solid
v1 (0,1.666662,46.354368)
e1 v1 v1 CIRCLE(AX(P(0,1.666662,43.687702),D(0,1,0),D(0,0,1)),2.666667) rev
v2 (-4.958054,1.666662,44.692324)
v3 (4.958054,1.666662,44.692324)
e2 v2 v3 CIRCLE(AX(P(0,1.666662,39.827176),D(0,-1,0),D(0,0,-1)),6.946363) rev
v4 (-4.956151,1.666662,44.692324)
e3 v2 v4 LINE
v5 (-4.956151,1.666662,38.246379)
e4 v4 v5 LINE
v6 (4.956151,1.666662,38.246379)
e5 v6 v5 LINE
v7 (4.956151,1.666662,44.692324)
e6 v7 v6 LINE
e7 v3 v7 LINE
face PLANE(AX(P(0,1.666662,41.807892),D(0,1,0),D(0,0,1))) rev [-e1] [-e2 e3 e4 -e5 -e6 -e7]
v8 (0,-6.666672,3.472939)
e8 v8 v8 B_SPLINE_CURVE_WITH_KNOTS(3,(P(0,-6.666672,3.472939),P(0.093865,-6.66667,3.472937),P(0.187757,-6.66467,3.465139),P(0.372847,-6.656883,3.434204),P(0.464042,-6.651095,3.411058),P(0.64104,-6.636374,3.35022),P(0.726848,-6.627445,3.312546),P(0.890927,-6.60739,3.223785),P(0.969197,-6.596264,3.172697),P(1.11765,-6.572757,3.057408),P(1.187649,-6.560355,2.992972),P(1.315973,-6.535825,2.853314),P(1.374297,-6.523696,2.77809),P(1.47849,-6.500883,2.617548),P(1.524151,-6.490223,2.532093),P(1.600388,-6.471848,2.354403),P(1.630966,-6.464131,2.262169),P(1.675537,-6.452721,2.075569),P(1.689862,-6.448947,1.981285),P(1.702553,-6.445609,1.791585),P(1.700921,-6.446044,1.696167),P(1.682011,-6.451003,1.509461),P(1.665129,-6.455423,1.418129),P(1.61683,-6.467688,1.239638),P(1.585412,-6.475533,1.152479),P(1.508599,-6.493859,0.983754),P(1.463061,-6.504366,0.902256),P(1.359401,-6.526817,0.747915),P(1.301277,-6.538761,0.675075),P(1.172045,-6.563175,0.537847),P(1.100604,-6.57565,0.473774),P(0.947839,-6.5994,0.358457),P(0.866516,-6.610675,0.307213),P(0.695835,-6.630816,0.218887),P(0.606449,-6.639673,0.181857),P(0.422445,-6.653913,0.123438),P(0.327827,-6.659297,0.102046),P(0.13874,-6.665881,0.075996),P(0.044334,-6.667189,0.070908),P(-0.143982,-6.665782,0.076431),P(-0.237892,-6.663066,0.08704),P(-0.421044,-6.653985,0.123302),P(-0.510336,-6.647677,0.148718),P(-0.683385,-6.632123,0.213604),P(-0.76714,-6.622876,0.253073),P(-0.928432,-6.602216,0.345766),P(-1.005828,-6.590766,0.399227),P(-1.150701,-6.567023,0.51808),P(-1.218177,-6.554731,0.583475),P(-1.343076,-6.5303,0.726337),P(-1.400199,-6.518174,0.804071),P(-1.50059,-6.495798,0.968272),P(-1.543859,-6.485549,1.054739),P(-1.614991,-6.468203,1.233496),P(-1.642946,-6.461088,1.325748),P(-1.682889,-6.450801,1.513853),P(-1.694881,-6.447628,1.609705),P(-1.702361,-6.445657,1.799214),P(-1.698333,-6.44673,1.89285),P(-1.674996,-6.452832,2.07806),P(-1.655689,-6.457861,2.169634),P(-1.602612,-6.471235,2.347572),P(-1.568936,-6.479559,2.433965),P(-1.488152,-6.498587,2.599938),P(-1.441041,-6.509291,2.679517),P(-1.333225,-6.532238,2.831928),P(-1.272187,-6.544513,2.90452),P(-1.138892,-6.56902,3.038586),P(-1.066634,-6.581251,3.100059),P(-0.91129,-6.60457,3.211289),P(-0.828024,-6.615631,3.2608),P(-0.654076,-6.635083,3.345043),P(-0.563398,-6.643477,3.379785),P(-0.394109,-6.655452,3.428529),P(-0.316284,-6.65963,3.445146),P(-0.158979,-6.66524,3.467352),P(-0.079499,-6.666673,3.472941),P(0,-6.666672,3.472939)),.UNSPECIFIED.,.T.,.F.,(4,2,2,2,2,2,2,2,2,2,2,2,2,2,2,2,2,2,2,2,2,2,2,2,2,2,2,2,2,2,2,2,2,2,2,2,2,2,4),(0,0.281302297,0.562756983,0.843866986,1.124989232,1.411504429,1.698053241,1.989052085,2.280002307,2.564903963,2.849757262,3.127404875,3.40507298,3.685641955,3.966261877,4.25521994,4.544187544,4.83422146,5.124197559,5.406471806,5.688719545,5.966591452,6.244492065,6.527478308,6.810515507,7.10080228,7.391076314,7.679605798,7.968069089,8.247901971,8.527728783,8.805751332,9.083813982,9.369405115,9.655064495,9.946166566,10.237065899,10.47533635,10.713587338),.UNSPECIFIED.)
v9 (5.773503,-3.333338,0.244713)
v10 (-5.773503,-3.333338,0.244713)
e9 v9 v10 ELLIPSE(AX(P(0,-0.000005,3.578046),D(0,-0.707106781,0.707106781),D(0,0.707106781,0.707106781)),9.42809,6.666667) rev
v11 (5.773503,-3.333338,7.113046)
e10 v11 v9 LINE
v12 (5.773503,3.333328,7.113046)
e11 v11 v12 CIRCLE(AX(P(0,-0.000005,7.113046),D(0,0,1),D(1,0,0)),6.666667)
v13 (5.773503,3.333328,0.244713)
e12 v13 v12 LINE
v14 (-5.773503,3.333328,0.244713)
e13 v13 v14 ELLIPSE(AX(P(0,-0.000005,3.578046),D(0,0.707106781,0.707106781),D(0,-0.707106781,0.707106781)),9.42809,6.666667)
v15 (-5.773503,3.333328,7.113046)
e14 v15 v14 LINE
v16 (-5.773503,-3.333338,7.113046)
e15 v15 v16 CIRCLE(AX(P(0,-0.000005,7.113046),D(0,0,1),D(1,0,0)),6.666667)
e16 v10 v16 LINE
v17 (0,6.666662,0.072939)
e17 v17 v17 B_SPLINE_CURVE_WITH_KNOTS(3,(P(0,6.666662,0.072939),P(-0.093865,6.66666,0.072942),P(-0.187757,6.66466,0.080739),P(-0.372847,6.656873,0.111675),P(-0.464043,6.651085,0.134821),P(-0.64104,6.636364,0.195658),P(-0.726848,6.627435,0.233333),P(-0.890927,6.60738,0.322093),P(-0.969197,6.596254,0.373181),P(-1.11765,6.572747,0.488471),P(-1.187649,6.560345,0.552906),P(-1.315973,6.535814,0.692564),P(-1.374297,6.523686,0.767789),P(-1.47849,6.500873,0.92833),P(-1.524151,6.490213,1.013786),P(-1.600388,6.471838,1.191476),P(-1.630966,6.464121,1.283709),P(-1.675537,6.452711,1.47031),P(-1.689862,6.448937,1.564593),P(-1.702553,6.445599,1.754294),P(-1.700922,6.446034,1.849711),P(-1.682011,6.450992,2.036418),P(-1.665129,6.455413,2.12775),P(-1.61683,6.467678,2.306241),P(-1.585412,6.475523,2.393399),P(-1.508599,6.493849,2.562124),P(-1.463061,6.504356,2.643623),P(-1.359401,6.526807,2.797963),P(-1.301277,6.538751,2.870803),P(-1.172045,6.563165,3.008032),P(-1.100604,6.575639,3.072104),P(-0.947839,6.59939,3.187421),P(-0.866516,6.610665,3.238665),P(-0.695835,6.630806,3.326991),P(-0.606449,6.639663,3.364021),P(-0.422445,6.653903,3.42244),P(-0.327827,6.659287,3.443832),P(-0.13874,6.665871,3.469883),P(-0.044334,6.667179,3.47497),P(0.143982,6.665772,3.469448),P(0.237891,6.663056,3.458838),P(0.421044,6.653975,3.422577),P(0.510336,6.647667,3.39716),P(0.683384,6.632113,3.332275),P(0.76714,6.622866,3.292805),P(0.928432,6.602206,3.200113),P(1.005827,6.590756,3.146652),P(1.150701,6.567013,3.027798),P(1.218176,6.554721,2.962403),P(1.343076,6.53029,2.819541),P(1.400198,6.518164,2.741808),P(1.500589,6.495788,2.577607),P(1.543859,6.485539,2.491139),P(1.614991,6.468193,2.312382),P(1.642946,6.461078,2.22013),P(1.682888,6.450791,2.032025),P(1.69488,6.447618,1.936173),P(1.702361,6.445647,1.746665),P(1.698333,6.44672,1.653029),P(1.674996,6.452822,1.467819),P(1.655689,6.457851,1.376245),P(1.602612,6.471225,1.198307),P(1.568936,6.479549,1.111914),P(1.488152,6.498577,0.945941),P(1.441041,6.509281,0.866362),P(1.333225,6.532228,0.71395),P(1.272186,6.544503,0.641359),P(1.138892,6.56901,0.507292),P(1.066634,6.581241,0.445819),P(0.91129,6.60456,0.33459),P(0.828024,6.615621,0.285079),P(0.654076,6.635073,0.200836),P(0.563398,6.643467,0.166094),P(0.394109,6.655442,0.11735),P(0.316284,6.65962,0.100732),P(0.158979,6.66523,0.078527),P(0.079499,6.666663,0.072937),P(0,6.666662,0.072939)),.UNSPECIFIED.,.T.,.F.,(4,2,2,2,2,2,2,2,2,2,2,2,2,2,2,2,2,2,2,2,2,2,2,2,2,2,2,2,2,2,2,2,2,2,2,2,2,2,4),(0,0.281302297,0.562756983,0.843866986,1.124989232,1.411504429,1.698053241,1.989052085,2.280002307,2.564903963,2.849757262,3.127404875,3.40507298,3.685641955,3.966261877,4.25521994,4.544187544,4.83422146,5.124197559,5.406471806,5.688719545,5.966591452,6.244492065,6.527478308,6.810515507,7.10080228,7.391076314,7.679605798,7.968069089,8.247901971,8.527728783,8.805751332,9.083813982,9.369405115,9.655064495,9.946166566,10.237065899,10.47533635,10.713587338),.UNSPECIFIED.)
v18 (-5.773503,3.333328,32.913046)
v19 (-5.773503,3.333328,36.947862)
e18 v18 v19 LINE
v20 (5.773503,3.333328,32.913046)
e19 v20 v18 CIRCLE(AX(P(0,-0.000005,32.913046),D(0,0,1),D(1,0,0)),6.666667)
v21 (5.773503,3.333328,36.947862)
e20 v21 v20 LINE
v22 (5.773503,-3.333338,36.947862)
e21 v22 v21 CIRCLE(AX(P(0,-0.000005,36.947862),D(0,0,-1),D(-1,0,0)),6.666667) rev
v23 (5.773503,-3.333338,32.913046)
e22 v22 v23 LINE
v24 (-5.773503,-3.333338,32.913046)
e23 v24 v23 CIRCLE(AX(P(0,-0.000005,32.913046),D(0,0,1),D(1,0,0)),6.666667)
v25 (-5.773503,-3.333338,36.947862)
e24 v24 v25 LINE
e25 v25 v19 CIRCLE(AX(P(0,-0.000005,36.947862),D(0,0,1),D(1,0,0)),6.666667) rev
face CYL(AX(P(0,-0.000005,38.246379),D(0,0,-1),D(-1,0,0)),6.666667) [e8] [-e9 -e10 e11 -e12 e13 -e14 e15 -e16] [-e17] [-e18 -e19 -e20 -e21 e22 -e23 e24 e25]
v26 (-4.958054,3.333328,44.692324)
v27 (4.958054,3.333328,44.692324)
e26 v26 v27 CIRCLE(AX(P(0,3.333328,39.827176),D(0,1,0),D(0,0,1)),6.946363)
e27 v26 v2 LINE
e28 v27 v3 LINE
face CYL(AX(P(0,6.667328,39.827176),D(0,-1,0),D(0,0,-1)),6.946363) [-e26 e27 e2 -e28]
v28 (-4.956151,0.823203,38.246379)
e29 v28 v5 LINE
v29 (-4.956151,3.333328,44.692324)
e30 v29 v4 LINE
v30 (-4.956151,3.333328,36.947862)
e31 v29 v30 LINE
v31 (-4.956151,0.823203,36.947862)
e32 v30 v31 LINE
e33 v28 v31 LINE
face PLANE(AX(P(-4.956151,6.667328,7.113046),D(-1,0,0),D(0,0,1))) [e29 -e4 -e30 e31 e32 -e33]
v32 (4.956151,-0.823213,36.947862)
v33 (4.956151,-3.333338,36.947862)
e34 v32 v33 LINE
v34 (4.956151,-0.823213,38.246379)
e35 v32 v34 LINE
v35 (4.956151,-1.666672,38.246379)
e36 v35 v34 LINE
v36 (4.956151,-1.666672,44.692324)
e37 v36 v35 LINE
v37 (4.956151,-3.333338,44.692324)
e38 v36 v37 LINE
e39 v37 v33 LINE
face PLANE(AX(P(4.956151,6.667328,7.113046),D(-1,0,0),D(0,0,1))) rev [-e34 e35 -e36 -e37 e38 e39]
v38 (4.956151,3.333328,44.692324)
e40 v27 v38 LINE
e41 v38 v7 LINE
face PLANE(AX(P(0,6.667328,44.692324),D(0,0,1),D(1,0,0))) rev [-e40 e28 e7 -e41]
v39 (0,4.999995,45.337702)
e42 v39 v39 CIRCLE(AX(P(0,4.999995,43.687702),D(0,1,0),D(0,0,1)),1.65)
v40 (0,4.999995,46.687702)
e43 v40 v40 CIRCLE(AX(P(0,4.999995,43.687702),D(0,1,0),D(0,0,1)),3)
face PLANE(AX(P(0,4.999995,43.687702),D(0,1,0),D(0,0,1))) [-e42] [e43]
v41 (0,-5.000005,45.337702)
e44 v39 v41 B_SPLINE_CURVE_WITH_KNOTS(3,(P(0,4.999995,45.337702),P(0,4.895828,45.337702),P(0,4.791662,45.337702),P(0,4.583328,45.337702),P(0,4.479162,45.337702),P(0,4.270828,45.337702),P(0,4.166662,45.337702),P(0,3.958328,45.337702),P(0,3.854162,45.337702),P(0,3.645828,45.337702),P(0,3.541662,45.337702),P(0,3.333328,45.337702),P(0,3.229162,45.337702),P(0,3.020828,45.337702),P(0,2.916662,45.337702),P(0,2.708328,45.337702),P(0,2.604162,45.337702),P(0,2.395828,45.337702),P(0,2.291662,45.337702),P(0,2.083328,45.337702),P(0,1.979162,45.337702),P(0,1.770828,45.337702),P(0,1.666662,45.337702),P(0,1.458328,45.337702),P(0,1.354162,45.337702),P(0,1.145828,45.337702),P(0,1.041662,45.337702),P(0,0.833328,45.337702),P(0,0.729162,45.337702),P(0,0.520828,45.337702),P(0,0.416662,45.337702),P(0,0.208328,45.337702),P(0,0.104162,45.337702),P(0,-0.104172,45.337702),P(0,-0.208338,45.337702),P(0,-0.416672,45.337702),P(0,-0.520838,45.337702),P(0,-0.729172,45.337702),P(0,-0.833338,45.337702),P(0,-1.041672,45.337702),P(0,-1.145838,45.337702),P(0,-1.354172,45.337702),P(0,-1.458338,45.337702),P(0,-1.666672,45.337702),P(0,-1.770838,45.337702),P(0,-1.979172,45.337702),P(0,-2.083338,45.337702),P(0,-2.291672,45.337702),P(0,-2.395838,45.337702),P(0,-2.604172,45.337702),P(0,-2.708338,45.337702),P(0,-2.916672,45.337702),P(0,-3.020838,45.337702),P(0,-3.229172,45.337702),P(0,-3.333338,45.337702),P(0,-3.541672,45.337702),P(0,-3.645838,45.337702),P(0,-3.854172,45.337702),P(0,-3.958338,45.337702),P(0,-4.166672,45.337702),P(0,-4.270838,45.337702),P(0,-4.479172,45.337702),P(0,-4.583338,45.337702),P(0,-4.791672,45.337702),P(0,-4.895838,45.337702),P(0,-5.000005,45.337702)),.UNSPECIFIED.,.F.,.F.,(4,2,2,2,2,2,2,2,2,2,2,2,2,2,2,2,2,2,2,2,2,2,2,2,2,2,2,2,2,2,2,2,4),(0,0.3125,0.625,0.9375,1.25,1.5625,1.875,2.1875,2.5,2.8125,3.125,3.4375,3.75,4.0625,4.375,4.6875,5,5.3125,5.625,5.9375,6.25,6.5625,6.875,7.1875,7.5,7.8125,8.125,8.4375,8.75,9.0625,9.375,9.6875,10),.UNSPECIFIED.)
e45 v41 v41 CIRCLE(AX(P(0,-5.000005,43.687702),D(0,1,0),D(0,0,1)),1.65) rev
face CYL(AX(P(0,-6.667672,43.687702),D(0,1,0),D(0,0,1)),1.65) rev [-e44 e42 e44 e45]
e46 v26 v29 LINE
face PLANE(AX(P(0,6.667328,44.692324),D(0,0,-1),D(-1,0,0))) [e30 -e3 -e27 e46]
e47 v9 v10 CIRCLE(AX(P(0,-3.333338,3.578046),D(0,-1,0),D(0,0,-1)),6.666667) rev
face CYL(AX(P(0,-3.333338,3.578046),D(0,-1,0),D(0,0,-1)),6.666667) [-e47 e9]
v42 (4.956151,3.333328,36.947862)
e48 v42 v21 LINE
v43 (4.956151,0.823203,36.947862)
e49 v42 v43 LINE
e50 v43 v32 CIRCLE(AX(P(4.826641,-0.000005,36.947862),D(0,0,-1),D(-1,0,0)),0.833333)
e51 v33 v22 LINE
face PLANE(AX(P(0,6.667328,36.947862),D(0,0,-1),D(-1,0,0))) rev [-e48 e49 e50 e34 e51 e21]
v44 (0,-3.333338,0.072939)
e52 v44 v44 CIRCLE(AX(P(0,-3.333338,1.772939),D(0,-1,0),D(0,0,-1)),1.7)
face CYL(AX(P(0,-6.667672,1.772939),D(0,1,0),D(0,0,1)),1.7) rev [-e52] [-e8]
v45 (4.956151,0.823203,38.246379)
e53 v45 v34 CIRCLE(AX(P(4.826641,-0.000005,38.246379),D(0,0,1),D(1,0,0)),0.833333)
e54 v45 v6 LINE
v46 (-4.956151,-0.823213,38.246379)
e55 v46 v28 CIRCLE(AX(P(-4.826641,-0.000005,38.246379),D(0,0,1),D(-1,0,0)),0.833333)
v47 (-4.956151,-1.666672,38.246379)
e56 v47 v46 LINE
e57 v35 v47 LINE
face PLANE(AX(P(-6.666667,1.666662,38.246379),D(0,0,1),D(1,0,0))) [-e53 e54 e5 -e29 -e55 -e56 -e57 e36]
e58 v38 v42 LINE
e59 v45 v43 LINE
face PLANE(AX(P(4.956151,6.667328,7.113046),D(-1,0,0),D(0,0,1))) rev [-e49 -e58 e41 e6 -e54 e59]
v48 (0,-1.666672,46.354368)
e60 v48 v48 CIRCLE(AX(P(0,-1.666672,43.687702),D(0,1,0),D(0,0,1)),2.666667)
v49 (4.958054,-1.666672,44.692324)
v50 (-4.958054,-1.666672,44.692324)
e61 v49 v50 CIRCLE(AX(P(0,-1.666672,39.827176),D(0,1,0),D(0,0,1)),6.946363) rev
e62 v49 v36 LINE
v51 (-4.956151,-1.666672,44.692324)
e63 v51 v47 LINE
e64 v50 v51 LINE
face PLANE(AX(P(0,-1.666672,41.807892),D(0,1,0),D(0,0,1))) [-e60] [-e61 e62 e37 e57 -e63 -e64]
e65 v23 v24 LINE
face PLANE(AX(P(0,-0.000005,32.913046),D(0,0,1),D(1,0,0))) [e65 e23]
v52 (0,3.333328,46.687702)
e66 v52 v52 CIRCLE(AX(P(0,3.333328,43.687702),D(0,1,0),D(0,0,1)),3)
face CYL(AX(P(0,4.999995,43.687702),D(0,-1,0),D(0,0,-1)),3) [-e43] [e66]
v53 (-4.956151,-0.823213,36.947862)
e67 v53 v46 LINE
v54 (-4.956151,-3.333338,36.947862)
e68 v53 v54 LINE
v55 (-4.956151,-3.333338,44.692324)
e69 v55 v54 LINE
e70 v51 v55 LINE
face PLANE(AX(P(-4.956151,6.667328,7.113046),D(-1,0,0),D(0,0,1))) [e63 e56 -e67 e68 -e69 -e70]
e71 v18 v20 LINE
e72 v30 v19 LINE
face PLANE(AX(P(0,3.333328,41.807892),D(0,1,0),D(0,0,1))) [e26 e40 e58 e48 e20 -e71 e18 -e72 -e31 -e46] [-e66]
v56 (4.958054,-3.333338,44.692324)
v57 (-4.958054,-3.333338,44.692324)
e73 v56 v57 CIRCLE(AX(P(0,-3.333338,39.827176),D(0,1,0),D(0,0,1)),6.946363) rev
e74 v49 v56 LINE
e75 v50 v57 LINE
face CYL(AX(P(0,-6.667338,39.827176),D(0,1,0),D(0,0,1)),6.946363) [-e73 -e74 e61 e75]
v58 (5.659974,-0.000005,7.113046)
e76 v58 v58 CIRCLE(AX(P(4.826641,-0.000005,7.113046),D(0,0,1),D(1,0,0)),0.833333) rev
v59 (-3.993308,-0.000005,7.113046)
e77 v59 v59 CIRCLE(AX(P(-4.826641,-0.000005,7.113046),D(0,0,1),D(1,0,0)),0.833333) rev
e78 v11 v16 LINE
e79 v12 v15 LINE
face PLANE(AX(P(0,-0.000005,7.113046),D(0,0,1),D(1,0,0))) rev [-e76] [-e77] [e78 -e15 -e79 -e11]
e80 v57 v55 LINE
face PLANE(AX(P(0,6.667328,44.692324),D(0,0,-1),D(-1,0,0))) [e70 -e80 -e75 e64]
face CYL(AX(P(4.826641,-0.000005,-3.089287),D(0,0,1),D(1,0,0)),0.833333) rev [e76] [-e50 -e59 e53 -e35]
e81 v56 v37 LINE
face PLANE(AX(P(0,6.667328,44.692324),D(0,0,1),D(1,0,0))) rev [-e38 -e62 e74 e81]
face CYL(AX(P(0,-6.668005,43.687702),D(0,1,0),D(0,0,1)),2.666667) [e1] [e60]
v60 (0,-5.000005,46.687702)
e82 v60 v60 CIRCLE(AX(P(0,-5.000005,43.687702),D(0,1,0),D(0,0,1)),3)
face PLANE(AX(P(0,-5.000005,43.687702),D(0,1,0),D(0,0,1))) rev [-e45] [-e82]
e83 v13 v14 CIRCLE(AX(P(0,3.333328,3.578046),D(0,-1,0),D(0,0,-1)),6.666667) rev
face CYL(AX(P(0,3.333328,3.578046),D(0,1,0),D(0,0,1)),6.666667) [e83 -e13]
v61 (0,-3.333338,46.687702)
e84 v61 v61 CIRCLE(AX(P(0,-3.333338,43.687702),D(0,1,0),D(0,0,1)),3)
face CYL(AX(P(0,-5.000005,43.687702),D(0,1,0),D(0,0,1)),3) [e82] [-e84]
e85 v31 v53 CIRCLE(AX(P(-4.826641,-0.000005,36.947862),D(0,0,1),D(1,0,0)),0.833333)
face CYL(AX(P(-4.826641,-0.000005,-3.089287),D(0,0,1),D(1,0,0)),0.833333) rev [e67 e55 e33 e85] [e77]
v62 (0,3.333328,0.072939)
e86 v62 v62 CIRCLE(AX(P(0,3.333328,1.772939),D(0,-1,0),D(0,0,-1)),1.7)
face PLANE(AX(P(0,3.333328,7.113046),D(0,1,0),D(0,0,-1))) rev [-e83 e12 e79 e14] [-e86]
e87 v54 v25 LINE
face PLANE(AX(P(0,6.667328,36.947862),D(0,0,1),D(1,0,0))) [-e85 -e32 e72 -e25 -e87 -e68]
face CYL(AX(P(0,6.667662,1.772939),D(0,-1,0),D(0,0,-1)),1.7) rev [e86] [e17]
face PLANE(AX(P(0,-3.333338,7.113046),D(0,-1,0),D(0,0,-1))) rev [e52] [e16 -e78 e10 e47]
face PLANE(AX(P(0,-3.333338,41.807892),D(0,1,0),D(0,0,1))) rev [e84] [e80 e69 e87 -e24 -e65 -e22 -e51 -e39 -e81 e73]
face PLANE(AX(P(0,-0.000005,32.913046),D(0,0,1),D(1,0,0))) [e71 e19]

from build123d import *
from build123d.topology import SkipClean

# Parameters (mm, degrees)
SKETCH2_R                       = 10
PHALANGE_LENGTH_DEPTH           = 46.7
BOSS_EXTRUDE3_DEPTH             = 5
BOSS_EXTRUDE4_DEPTH             = 5
BOSS_EXTRUDE4_DEPTH_BACK        = 5
CUT_EXTRUDE2_START              = -15.3025
CUT_EXTRUDE2_DEPTH              = 15.3025
SKETCH7_R                       = 1.65
CUT_EXTRUDE3_DEPTH              = 10
CUT_EXTRUDE4_DEPTH              = 2.5
CUT_EXTRUDE4_DEPTH_BACK         = 2.5
CUT_EXTRUDE7_REACH              = 66.618
SKETCH4_R                       = 1.65
CUT_EXTRUDE7_DIRECTION_2_REACH  = 66.618
CUT_EXTRUDE_THIN1_START         = 46.7
CUT_EXTRUDE_THIN1_DEPTH         = 10.361670454
BOSS_EXTRUDE5_REACH             = 66.084
SKETCH9_R                       = 4
SKETCH9_R_2                     = 1.65
CUT_EXTRUDE8_REACH              = 65.595
SKETCH10_R                      = 1.25
CUT_EXTRUDE9_START              = -8
CUT_EXTRUDE9_DEPTH              = 8
CUT_EXTRUDE10_REACH             = 66.084
CUT_EXTRUDE10_DIRECTION_2_REACH = 66.084
CUT_EXTRUDE11_START             = -10
CUT_EXTRUDE11_OUTLINE_W         = 2.565773848
CUT_EXTRUDE11_OUTLINE_H         = 11.6166929
CUT_EXTRUDE11_DEPTH             = 10
BOSS_EXTRUDE6_START             = 7.5
SKETCH14_R                      = 4.5
SKETCH14_R_2                    = 1.65
BOSS_EXTRUDE6_DEPTH             = 2.5
BOSS_EXTRUDE7_START             = -7.5
SKETCH14_2_R                    = 4.5
SKETCH14_2_R_2                  = 1.65
BOSS_EXTRUDE7_DEPTH             = 2.5
SCALE1_SCALE                    = 0.666666667
CUT_EXTRUDE12_START             = -11.666667
SKETCH15_R                      = 1.65
CUT_EXTRUDE12_DEPTH             = 13.333339
CUT_EXTRUDE13_REACH             = 50.293
SKETCH16_R                      = 1.7
CUT_EXTRUDE13_DIRECTION_2_REACH = 50.293


# Read off the part's stored shape, not the designer's step: Cut-Extrude-Thin1, Cut-Extrude11
with BuildPart() as part:
    # Sketch2 → Phalange Length (new body)
    with BuildSketch(Plane.XY):
        Circle(SKETCH2_R)
    extrude(amount=PHALANGE_LENGTH_DEPTH)

    # Sketch3 → Boss-Extrude3 (add)
    with BuildSketch(Plane(origin=(0, -10, 0), x_dir=(-1, 0, 0), z_dir=(0, -1, 0))):
        with BuildLine():
            Line((-10, 5.302499701), (-10, 0))
            Line((-10, 0), (10, 0))
            Line((10, 0), (10, 5.302499701))
            ThreePointArc((10, 5.302499701), (0, 15.302499701), (-10, 5.302499701))
        make_face()
    boss_extrude3 = extrude(amount=-BOSS_EXTRUDE3_DEPTH)

    # Mirror1: Boss-Extrude3 across plane
    add(boss_extrude3.mirror(Plane.ZX))

    # Sketch5 → Boss-Extrude4 (add, two sides: drawn at the far end of the back side and taken through both)
    with BuildSketch(Plane(origin=(0, 0, 0), x_dir=(1, 0, 0), z_dir=(0, 1, 0)).offset(-BOSS_EXTRUDE4_DEPTH_BACK)):
        with BuildLine():
            Line((-10, -52.483157911), (-10, -46.7))
            Line((-10, -46.7), (10, -46.7))
            Line((10, -46.7), (10, -52.483157911))
            ThreePointArc((10, -52.483157911), (0, -62.051984156), (-10, -52.483157911))
        make_face()
    extrude(amount=BOSS_EXTRUDE4_DEPTH + BOSS_EXTRUDE4_DEPTH_BACK)

    # Sketch6 → Cut-Extrude2 (cut)
    with SkipClean():  # the faces are left unmerged after this step: merging them gives an invalid solid
        with BuildSketch(Plane.XY.offset(CUT_EXTRUDE2_START)):
            with BuildLine():
                ThreePointArc((0, 10), (5, 8.660254038), (8.660254038, 5))
                Line((8.660254038, 5), (10, 5))
                Line((10, 5), (10, 10))
                Line((10, 10), (0, 10))
            make_face()
            with BuildLine():
                Line((10, -5), (8.660254038, -5))
                ThreePointArc((8.660254038, -5), (5, -8.660254038), (0, -10))
                Line((0, -10), (10, -10))
                Line((10, -10), (10, -5))
            make_face()
            with BuildLine():
                ThreePointArc((-8.660254038, 5), (-5, 8.660254038), (0, 10))
                Line((0, 10), (-10, 10))
                Line((-10, 10), (-10, 5))
                Line((-10, 5), (-8.660254038, 5))
            make_face()
            with BuildLine():
                Line((-10, -10), (0, -10))
                ThreePointArc((0, -10), (-5, -8.660254038), (-8.660254038, -5))
                Line((-8.660254038, -5), (-10, -5))
                Line((-10, -5), (-10, -10))
            make_face()
        extrude(amount=CUT_EXTRUDE2_DEPTH, mode=Mode.SUBTRACT)

    # Sketch7 → Cut-Extrude3 (cut)
    with SkipClean():  # the faces are left unmerged after this step: merging them gives an invalid solid
        with BuildSketch(Plane(origin=(0, 5, 0), x_dir=(1, 0, 0), z_dir=(0, 1, 0))):
            with Locations(Location((0, -54.861984156, 0), (0, 0, 270))):
                Circle(SKETCH7_R)
        extrude(amount=-CUT_EXTRUDE3_DEPTH, mode=Mode.SUBTRACT)

    # Sketch5<2> → Cut-Extrude4 (cut, two sides: drawn at the far end of the back side and taken through both)
    with BuildSketch(Plane(origin=(0, 0, 0), x_dir=(1, 0, 0), z_dir=(0, 1, 0)).offset(-CUT_EXTRUDE4_DEPTH_BACK)):
        with BuildLine():
            Line((-10, -52.483157911), (-10, -46.7))
            Line((-10, -46.7), (10, -46.7))
            Line((10, -46.7), (10, -52.483157911))
            ThreePointArc((10, -52.483157911), (0, -62.051984156), (-10, -52.483157911))
        make_face()
    extrude(amount=CUT_EXTRUDE4_DEPTH + CUT_EXTRUDE4_DEPTH_BACK, mode=Mode.SUBTRACT)

    # Sketch4 → Cut-Extrude7 (cut, up to next)
    with BuildSketch(Plane(origin=(0, -5, 0), x_dir=(1, 0, 0), z_dir=(0, 1, 0)), mode=Mode.PRIVATE) as cut_extrude7_sk1:
        with Locations(Location((0, 8.010159673, 0), (0, 0, 270))):
            Circle(SKETCH4_R)
    cut_extrude7_tool1 = extrude(cut_extrude7_sk1.sketch, amount=-CUT_EXTRUDE7_REACH, mode=Mode.PRIVATE) & part.part
    add(cut_extrude7_tool1.solids().sort_by_distance((0, -5, -8.01016))[0], mode=Mode.SUBTRACT)

    # Sketch4 → Cut-Extrude7 direction 2 (cut, up to next)
    with BuildSketch(Plane(origin=(0, -5, 0), x_dir=(1, 0, 0), z_dir=(0, 1, 0)), mode=Mode.PRIVATE) as cut_extrude7_direction_2_sk1:
        with Locations(Location((0, 8.010159673, 0), (0, 0, 270))):
            Circle(SKETCH4_R)
    cut_extrude7_direction_2_tool1 = extrude(cut_extrude7_direction_2_sk1.sketch, amount=CUT_EXTRUDE7_DIRECTION_2_REACH, mode=Mode.PRIVATE) & part.part
    add(cut_extrude7_direction_2_tool1.solids().sort_by_distance((0, -5, -8.01016))[0], mode=Mode.SUBTRACT)

    # Cut-Extrude-Thin1 outline → Cut-Extrude-Thin1 (cut)
    with SkipClean():  # the faces are left unmerged after this step: merging them gives an invalid solid
        with BuildSketch(Plane.XY.offset(CUT_EXTRUDE_THIN1_START)):
            with BuildLine():
                ThreePointArc((8.660254038, 5), (9.256147934, 3.78466979), (9.682458366, 2.5))
                Line((9.682458366, 2.5), (10, 2.5))
                Line((10, 2.5), (10, 5))
                Line((10, 5), (8.660254038, 5))
            make_face()
            with BuildLine():
                Line((10, -2.5), (9.682458366, -2.5))
                ThreePointArc((9.682458366, -2.5), (9.256147934, -3.78466979), (8.660254038, -5))
                Line((8.660254038, -5), (10, -5))
                Line((10, -5), (10, -2.5))
            make_face()
            with BuildLine():
                Line((-10, 2.5), (-9.682458366, 2.5))
                ThreePointArc((-9.682458366, 2.5), (-9.256147934, 3.78466979), (-8.660254038, 5))
                Line((-8.660254038, 5), (-10, 5))
                Line((-10, 5), (-10, 2.5))
            make_face()
            with BuildLine():
                ThreePointArc((-8.660254038, -5), (-9.256147934, -3.78466979), (-9.682458366, -2.5))
                Line((-9.682458366, -2.5), (-10, -2.5))
                Line((-10, -2.5), (-10, -5))
                Line((-10, -5), (-8.660254038, -5))
            make_face()
        extrude(amount=CUT_EXTRUDE_THIN1_DEPTH, mode=Mode.SUBTRACT)

    # Sketch9 → Boss-Extrude5 (add, up to next)
    with BuildSketch(Plane.XZ.offset(-2.5), mode=Mode.PRIVATE) as boss_extrude5_sk1:
        with Locations(Location((0, 54.861984156, 0), (0, 0, 90))):
            Circle(SKETCH9_R)
        with Locations(Location((0, 54.861984156, 0), (0, 0, 90))):
            Circle(SKETCH9_R_2, mode=Mode.SUBTRACT)
    boss_extrude5_tool1 = extrude(boss_extrude5_sk1.sketch, amount=BOSS_EXTRUDE5_REACH, mode=Mode.PRIVATE) - part.part
    add(boss_extrude5_tool1.solids().sort_by_distance((0, 2.5, 50.975121))[0])

    # Sketch10 → Cut-Extrude8 (cut, up to next)
    with BuildSketch(Plane.XY.offset(46.7), mode=Mode.PRIVATE) as cut_extrude8_sk1:
        with Locations((7.239961745, 0)):
            Circle(SKETCH10_R)
    cut_extrude8_tool1 = extrude(cut_extrude8_sk1.sketch, amount=-CUT_EXTRUDE8_REACH, mode=Mode.PRIVATE) & part.part
    # Sketch10 → Cut-Extrude8 (cut, up to next)
    with BuildSketch(Plane.XY.offset(46.7), mode=Mode.PRIVATE) as cut_extrude8_sk2:
        with Locations((-7.239961745, 0)):
            Circle(SKETCH10_R)
    cut_extrude8_tool2 = extrude(cut_extrude8_sk2.sketch, amount=-CUT_EXTRUDE8_REACH, mode=Mode.PRIVATE) & part.part
    add(cut_extrude8_tool1.solids().sort_by_distance((7.239962, 0, 46.7))[0], mode=Mode.SUBTRACT)
    add(cut_extrude8_tool2.solids().sort_by_distance((-7.239962, 0, 46.7))[0], mode=Mode.SUBTRACT)

    # Sketch11 → Cut-Extrude9 (cut)
    with SkipClean():  # the faces are left unmerged after this step: merging them gives an invalid solid
        with BuildSketch(Plane.XY.offset(46.7).offset(CUT_EXTRUDE9_START)):
            with BuildLine():
                ThreePointArc((8.660254038, 5), (0, 10), (-8.660254038, 5))
                Line((-8.660254038, 5), (8.660254038, 5))
            make_face()
            with BuildLine():
                Line((8.660254038, -5), (-8.660254038, -5))
                ThreePointArc((-8.660254038, -5), (0, -10), (8.660254038, -5))
            make_face()
        extrude(amount=CUT_EXTRUDE9_DEPTH, mode=Mode.SUBTRACT)

    # Sketch12 → Cut-Extrude10 (cut, up to next)
    with BuildSketch(Plane.XZ.offset(-2.5), mode=Mode.PRIVATE) as cut_extrude10_sk1:
        with BuildLine():
            ThreePointArc((0, 62.051984156), (-5.99753031, 60.05625831), (-9.603498629, 54.864892021))
            Line((-9.603498629, 54.864892021), (-8.660254038, 54.864892021))
            ThreePointArc((-8.660254038, 54.864892021), (0, 59.490740593), (8.660254038, 54.864892021))
            Line((8.660254038, 54.864892021), (9.603498629, 54.864892021))
            ThreePointArc((9.603498629, 54.864892021), (5.99753031, 60.05625831), (0, 62.051984156))
        make_face()
    cut_extrude10_tool1 = extrude(cut_extrude10_sk1.sketch, amount=CUT_EXTRUDE10_REACH, mode=Mode.PRIVATE) & part.part
    add(cut_extrude10_tool1.solids().sort_by_distance((5.874655, 2.5, 59.89207))[0], mode=Mode.SUBTRACT)

    # Sketch12 → Cut-Extrude10 direction 2 (cut, up to next)
    with BuildSketch(Plane.XZ.offset(-2.5), mode=Mode.PRIVATE) as cut_extrude10_direction_2_sk1:
        with BuildLine():
            ThreePointArc((0, 62.051984156), (-5.99753031, 60.05625831), (-9.603498629, 54.864892021))
            Line((-9.603498629, 54.864892021), (-8.660254038, 54.864892021))
            ThreePointArc((-8.660254038, 54.864892021), (0, 59.490740593), (8.660254038, 54.864892021))
            Line((8.660254038, 54.864892021), (9.603498629, 54.864892021))
            ThreePointArc((9.603498629, 54.864892021), (5.99753031, 60.05625831), (0, 62.051984156))
        make_face()
    cut_extrude10_direction_2_tool1 = extrude(cut_extrude10_direction_2_sk1.sketch, amount=-CUT_EXTRUDE10_DIRECTION_2_REACH, mode=Mode.PRIVATE) & part.part
    add(cut_extrude10_direction_2_tool1.solids().sort_by_distance((5.874655, 2.5, 59.89207))[0], mode=Mode.SUBTRACT)

    # Cut-Extrude11 outline → Cut-Extrude11 (cut)
    with BuildSketch(Plane.XZ.offset(5).offset(CUT_EXTRUDE11_START)):
        with Locations((-8.717113076, 50.560571369)):
            Rectangle(CUT_EXTRUDE11_OUTLINE_W, CUT_EXTRUDE11_OUTLINE_H)
        with Locations((8.717113076, 50.560571369)):
            Rectangle(CUT_EXTRUDE11_OUTLINE_W, CUT_EXTRUDE11_OUTLINE_H)
    extrude(amount=CUT_EXTRUDE11_DEPTH, mode=Mode.SUBTRACT)

    # Sketch14 → Boss-Extrude6 (add)
    with SkipClean():  # the faces are left unmerged after this step: merging them gives an invalid solid
        with BuildSketch(Plane(origin=(0, 0, 0), x_dir=(1, 0, 0), z_dir=(0, 1, 0)).offset(BOSS_EXTRUDE6_START)):
            with Locations(Location((0, -54.861984156, 0), (0, 0, 270))):
                Circle(SKETCH14_R)
            with Locations(Location((0, -54.861984156, 0), (0, 0, 270))):
                Circle(SKETCH14_R_2, mode=Mode.SUBTRACT)
        extrude(amount=-BOSS_EXTRUDE6_DEPTH)

    # Sketch14<2> → Boss-Extrude7 (add)
    with SkipClean():  # the faces are left unmerged after this step: merging them gives an invalid solid
        with BuildSketch(Plane(origin=(0, 0, 0), x_dir=(1, 0, 0), z_dir=(0, 1, 0)).offset(BOSS_EXTRUDE7_START)):
            with Locations(Location((0, -54.861984156, 0), (0, 0, 270))):
                Circle(SKETCH14_2_R)
            with Locations(Location((0, -54.861984156, 0), (0, 0, 270))):
                Circle(SKETCH14_2_R_2, mode=Mode.SUBTRACT)
        extrude(amount=BOSS_EXTRUDE7_DEPTH)


with BuildPart() as part_1:
    # Scale1: scaled about (0, 4.3e-08, 21.33862286)
    add(part.part.scale(SCALE1_SCALE).moved(Location((0, 1.4e-08, 7.112874287))))

    # Sketch15 → Cut-Extrude12 (cut)
    with BuildSketch(Plane(origin=(0, 4.999994977, 0), x_dir=(1, 0, 0), z_dir=(0, 1, 0)).offset(CUT_EXTRUDE12_START)):
        with Locations(Location((-5.6e-08, -43.687701746, 0), (0, 0, 270))):
            Circle(SKETCH15_R)
    extrude(amount=CUT_EXTRUDE12_DEPTH, mode=Mode.SUBTRACT)

    # Sketch16 → Cut-Extrude13 (cut, up to next)
    with BuildSketch(Plane.XZ.offset(-3.333328311), mode=Mode.PRIVATE) as cut_extrude13_sk1:
        with Locations(Location((-5.6e-08, 1.772939193, 0), (0, 0, 270))):
            Circle(SKETCH16_R)
    cut_extrude13_tool1 = extrude(cut_extrude13_sk1.sketch, amount=-CUT_EXTRUDE13_REACH, mode=Mode.PRIVATE) & part_1.part
    add(cut_extrude13_tool1.solids().sort_by_distance((0, 3.333328, 1.772939))[0], mode=Mode.SUBTRACT)

    # Sketch16 → Cut-Extrude13 direction 2 (cut, up to next)
    with BuildSketch(Plane.XZ.offset(-3.333328311), mode=Mode.PRIVATE) as cut_extrude13_direction_2_sk1:
        with Locations(Location((-5.6e-08, 1.772939193, 0), (0, 0, 270))):
            Circle(SKETCH16_R)
    cut_extrude13_direction_2_tool1 = extrude(cut_extrude13_direction_2_sk1.sketch, amount=CUT_EXTRUDE13_DIRECTION_2_REACH, mode=Mode.PRIVATE) & part_1.part
    add(cut_extrude13_direction_2_tool1.solids().sort_by_distance((0, 3.333328, 1.772939))[0], mode=Mode.SUBTRACT)


solid = part_1.part
